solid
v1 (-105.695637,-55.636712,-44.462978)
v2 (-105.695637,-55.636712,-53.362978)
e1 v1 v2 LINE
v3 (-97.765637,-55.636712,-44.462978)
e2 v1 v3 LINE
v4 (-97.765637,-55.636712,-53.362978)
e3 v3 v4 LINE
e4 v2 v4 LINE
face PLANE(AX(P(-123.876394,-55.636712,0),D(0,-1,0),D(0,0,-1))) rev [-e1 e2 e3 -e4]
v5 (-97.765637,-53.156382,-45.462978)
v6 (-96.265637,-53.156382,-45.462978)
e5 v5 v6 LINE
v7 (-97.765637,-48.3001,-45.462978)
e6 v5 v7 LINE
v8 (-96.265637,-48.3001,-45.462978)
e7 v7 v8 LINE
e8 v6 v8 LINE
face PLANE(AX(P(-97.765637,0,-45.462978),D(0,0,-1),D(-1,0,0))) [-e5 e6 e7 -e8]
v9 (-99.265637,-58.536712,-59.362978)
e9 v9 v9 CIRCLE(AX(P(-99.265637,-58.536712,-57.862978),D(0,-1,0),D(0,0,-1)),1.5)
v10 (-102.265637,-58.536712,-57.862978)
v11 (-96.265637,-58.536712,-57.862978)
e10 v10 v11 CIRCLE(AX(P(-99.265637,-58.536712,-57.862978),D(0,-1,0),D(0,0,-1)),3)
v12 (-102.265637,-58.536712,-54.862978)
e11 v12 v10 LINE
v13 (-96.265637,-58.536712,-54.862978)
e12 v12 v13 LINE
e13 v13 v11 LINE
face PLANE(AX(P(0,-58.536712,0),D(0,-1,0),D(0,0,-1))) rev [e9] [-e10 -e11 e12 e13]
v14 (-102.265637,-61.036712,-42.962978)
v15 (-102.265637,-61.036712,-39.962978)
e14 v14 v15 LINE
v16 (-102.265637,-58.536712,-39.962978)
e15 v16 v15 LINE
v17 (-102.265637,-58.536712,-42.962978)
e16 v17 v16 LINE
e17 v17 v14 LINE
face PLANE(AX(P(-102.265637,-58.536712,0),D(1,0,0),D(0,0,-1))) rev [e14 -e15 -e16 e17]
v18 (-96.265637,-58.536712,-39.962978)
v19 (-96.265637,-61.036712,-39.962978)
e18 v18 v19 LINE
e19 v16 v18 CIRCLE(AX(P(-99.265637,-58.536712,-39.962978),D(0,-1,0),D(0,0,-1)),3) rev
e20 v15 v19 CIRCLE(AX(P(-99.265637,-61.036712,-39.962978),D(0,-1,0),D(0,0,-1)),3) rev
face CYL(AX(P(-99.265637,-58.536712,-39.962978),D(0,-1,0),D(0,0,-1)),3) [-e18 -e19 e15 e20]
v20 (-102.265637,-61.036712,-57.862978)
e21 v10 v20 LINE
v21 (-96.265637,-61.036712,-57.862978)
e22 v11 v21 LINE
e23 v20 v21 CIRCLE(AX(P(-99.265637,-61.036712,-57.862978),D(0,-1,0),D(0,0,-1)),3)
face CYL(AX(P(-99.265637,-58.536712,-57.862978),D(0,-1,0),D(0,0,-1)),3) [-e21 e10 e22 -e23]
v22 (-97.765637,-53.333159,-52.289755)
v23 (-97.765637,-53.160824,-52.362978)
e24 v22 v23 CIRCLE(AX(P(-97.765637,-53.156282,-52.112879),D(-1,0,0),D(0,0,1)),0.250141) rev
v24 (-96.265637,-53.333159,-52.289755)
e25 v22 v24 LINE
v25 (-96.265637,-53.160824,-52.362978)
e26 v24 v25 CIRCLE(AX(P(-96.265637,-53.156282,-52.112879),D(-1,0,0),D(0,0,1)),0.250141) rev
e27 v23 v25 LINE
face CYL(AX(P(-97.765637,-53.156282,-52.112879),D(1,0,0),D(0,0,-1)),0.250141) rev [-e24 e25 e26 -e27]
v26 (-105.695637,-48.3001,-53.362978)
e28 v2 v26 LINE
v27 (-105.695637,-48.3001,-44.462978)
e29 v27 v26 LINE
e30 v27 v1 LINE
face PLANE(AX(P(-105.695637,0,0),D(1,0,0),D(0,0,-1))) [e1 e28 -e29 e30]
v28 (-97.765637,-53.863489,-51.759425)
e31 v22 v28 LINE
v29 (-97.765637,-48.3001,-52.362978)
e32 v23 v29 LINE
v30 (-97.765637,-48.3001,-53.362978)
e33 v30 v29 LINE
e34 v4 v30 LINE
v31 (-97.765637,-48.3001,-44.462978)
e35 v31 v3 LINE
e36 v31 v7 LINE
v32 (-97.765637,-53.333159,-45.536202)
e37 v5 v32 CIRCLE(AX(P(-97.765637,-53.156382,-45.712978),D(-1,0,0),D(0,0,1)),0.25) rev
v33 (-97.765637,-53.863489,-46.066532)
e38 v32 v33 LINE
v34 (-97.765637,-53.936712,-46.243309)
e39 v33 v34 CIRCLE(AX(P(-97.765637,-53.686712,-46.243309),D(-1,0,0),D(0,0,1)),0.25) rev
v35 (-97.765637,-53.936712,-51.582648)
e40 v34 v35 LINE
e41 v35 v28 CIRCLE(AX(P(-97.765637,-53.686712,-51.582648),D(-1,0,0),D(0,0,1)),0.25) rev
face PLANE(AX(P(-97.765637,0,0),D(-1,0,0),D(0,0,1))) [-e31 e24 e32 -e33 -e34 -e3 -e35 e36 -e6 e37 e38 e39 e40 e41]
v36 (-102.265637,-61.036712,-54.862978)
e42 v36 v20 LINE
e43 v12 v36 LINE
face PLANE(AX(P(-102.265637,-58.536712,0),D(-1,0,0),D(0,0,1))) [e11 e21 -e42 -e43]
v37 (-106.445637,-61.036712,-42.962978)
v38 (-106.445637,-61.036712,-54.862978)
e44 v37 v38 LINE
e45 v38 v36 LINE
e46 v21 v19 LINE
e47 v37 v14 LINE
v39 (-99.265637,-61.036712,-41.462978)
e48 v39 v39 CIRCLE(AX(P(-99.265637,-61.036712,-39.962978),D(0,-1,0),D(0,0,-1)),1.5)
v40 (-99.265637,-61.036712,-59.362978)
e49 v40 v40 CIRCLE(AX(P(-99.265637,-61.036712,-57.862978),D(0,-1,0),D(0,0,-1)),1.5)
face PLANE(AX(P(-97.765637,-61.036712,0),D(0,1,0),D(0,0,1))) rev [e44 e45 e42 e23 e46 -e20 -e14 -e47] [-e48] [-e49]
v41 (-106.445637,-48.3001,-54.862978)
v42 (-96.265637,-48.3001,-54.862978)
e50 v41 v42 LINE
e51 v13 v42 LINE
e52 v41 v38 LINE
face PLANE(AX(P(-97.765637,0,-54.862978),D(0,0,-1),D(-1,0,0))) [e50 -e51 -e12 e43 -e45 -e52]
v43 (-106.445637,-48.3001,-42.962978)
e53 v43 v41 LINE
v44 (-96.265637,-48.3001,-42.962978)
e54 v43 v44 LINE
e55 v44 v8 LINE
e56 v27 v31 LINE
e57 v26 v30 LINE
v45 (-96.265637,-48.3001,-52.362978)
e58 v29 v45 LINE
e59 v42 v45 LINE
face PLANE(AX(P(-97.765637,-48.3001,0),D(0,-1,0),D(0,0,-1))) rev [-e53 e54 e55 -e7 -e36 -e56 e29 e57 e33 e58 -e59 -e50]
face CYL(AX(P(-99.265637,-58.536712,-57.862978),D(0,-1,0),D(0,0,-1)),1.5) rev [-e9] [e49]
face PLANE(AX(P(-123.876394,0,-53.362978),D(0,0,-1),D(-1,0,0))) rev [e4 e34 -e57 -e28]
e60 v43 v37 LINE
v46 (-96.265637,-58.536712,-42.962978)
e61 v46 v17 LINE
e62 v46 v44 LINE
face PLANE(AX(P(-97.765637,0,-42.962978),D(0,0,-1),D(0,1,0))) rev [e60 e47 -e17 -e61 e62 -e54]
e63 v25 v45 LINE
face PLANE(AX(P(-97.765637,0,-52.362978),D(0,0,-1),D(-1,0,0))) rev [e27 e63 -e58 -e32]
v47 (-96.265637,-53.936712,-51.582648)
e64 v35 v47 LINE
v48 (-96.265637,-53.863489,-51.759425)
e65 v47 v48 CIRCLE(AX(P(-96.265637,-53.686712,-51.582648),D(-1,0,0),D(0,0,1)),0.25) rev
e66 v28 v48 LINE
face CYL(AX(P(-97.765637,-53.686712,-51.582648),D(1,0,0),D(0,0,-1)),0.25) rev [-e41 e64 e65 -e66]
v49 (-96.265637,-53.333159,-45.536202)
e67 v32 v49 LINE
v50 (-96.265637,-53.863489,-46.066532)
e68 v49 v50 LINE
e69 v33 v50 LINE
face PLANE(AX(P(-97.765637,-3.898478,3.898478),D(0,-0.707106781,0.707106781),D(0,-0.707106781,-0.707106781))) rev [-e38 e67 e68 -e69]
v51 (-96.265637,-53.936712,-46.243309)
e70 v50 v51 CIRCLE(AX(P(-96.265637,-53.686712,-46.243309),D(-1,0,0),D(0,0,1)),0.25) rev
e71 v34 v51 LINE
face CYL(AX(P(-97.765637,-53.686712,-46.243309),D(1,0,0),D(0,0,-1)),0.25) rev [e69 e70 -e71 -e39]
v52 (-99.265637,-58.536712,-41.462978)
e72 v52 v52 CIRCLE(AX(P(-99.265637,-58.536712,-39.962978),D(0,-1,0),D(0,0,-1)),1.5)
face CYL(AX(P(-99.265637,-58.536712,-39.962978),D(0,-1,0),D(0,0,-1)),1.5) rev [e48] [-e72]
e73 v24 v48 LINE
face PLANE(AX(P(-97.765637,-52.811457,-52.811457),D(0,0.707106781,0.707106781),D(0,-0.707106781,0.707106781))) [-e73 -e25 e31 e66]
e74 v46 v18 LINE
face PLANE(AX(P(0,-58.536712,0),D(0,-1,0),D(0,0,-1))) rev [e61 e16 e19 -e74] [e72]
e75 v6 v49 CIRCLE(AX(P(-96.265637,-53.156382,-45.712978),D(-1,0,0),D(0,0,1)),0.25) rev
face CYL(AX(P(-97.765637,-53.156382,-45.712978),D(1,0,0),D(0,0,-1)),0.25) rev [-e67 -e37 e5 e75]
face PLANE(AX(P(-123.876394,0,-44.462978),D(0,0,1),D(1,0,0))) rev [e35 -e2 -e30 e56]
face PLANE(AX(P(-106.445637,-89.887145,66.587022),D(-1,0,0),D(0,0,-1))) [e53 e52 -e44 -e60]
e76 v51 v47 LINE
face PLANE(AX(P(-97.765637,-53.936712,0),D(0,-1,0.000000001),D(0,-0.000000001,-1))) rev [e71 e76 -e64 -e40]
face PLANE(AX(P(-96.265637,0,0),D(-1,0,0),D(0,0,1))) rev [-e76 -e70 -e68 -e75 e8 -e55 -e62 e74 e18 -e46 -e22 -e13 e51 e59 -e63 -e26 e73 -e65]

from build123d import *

# Parameters (mm, degrees)
BOSS_EXTRUDE6_START     = 1.5
BOSS_EXTRUDE6_DEPTH     = 1.5
BOSS_EXTRUDE7_START     = 3
SKETCH1_5_W             = 11.9
SKETCH1_5_H             = 5.3
SKETCH1_5_W_2           = 1.5
SKETCH1_5_H_2           = 5.936611654
BOSS_EXTRUDE7_DEPTH     = 7.93
BOSS_EXTRUDE8_START     = 10.93
BOSS_EXTRUDE8_OUTLINE_W = 11.9
BOSS_EXTRUDE8_OUTLINE_H = 12.736611654
BOSS_EXTRUDE8_DEPTH     = 0.75
SKETCH4_R               = 1.5
BOSS_EXTRUDE10_DEPTH    = 2.5


# Read off the part's stored shape, not the designer's step: Boss-Extrude8
with BuildPart() as part:
    # Sketch1 → Boss-Extrude6 (new body)
    with BuildSketch(Plane.ZY.offset(94.76563723).offset(BOSS_EXTRUDE6_START)):
        with BuildLine():
            Line((-51.759425025, -53.863488773), (-52.289755114, -53.333158684))
            ThreePointArc((-52.289755114, -53.333158684), (-52.343100233, -53.254101332), (-52.362978418, -53.160824194))
            Line((-52.362978418, -53.160824194), (-52.362978418, -48.300100424))
            Line((-52.362978418, -48.300100424), (-54.862978418, -48.300100424))
            Line((-54.862978418, -48.300100424), (-54.862978418, -61.036712078))
            Line((-54.862978418, -61.036712078), (-42.962978418, -61.036712078))
            Line((-42.962978418, -61.036712078), (-42.962978418, -48.300100424))
            Line((-42.962978418, -48.300100424), (-45.462978418, -48.300100424))
            Line((-45.462978418, -48.300100424), (-45.462978418, -53.156381989))
            ThreePointArc((-45.462978418, -53.156381989), (-45.482008535, -53.252052847), (-45.536201723, -53.333158684))
            Line((-45.536201723, -53.333158684), (-46.066531809, -53.86348877))
            ThreePointArc((-46.066531809, -53.86348877), (-46.147637646, -53.917681958), (-46.243308504, -53.936712075))
            Line((-46.243308504, -53.936712075), (-51.582648329, -53.936712078))
            ThreePointArc((-51.582648329, -53.936712078), (-51.678319187, -53.917681961), (-51.759425025, -53.863488773))
        make_face()
    extrude(amount=BOSS_EXTRUDE6_DEPTH)

    # Sketch1<5> → Boss-Extrude7 (add)
    with BuildSketch(Plane.ZY.offset(94.76563723).offset(BOSS_EXTRUDE7_START)):
        with Locations((-48.912978418, -58.386712078)):
            Rectangle(SKETCH1_5_W, SKETCH1_5_H)
        Polygon((-53.362978418, -55.636712078), (-53.362978418, -54.236712078), (-54.862978418, -54.236712078), (-54.862978418, -55.736712078), (-42.962978418, -55.736712078), (-42.962978418, -54.236712078), (-44.462978418, -54.236712078), (-44.462978418, -55.636712078), align=None)
        with Locations((-54.112978418, -51.268406251)):
            Rectangle(SKETCH1_5_W_2, SKETCH1_5_H_2)
        with Locations((-43.712978418, -51.268406251)):
            Rectangle(SKETCH1_5_W_2, SKETCH1_5_H_2)
    extrude(amount=BOSS_EXTRUDE7_DEPTH)

    # Boss-Extrude8 outline → Boss-Extrude8 (add)
    with BuildSketch(Plane.ZY.offset(94.76563723).offset(BOSS_EXTRUDE8_START)):
        with Locations((-48.912978418, -54.668406251)):
            Rectangle(BOSS_EXTRUDE8_OUTLINE_W, BOSS_EXTRUDE8_OUTLINE_H)
    extrude(amount=BOSS_EXTRUDE8_DEPTH)

    # Sketch4 → Boss-Extrude10 (add)
    # profile 1 of 2: a face of its own
    with BuildSketch(Plane.XZ.offset(61.036712078)):
        with BuildLine():
            Line((-102.26563723, -39.962978418), (-102.26563723, -42.962978418))
            Line((-102.26563723, -42.962978418), (-96.26563723, -42.962978418))
            Line((-96.26563723, -42.962978418), (-96.26563723, -39.962978418))
            ThreePointArc((-96.26563723, -39.962978418), (-99.26563723, -36.962978418), (-102.26563723, -39.962978418))
        make_face()
        with Locations(Location((-99.26563723, -39.962978418, 0), (0, 0, 270))):
            Circle(SKETCH4_R, mode=Mode.SUBTRACT)
    # profile 2 of 2: a face of its own
    with BuildSketch(Plane.XZ.offset(61.036712078)):
        with BuildLine():
            Line((-96.26563723, -57.862978418), (-96.26563723, -54.862978418))
            Line((-96.26563723, -54.862978418), (-102.26563723, -54.862978418))
            Line((-102.26563723, -54.862978418), (-102.26563723, -57.862978418))
            ThreePointArc((-102.26563723, -57.862978418), (-99.26563723, -60.862978418), (-96.26563723, -57.862978418))
        make_face()
        with Locations(Location((-99.26563723, -57.862978418, 0), (0, 0, 270))):
            Circle(SKETCH4_R, mode=Mode.SUBTRACT)
    extrude(amount=-BOSS_EXTRUDE10_DEPTH)


solid = part.part
